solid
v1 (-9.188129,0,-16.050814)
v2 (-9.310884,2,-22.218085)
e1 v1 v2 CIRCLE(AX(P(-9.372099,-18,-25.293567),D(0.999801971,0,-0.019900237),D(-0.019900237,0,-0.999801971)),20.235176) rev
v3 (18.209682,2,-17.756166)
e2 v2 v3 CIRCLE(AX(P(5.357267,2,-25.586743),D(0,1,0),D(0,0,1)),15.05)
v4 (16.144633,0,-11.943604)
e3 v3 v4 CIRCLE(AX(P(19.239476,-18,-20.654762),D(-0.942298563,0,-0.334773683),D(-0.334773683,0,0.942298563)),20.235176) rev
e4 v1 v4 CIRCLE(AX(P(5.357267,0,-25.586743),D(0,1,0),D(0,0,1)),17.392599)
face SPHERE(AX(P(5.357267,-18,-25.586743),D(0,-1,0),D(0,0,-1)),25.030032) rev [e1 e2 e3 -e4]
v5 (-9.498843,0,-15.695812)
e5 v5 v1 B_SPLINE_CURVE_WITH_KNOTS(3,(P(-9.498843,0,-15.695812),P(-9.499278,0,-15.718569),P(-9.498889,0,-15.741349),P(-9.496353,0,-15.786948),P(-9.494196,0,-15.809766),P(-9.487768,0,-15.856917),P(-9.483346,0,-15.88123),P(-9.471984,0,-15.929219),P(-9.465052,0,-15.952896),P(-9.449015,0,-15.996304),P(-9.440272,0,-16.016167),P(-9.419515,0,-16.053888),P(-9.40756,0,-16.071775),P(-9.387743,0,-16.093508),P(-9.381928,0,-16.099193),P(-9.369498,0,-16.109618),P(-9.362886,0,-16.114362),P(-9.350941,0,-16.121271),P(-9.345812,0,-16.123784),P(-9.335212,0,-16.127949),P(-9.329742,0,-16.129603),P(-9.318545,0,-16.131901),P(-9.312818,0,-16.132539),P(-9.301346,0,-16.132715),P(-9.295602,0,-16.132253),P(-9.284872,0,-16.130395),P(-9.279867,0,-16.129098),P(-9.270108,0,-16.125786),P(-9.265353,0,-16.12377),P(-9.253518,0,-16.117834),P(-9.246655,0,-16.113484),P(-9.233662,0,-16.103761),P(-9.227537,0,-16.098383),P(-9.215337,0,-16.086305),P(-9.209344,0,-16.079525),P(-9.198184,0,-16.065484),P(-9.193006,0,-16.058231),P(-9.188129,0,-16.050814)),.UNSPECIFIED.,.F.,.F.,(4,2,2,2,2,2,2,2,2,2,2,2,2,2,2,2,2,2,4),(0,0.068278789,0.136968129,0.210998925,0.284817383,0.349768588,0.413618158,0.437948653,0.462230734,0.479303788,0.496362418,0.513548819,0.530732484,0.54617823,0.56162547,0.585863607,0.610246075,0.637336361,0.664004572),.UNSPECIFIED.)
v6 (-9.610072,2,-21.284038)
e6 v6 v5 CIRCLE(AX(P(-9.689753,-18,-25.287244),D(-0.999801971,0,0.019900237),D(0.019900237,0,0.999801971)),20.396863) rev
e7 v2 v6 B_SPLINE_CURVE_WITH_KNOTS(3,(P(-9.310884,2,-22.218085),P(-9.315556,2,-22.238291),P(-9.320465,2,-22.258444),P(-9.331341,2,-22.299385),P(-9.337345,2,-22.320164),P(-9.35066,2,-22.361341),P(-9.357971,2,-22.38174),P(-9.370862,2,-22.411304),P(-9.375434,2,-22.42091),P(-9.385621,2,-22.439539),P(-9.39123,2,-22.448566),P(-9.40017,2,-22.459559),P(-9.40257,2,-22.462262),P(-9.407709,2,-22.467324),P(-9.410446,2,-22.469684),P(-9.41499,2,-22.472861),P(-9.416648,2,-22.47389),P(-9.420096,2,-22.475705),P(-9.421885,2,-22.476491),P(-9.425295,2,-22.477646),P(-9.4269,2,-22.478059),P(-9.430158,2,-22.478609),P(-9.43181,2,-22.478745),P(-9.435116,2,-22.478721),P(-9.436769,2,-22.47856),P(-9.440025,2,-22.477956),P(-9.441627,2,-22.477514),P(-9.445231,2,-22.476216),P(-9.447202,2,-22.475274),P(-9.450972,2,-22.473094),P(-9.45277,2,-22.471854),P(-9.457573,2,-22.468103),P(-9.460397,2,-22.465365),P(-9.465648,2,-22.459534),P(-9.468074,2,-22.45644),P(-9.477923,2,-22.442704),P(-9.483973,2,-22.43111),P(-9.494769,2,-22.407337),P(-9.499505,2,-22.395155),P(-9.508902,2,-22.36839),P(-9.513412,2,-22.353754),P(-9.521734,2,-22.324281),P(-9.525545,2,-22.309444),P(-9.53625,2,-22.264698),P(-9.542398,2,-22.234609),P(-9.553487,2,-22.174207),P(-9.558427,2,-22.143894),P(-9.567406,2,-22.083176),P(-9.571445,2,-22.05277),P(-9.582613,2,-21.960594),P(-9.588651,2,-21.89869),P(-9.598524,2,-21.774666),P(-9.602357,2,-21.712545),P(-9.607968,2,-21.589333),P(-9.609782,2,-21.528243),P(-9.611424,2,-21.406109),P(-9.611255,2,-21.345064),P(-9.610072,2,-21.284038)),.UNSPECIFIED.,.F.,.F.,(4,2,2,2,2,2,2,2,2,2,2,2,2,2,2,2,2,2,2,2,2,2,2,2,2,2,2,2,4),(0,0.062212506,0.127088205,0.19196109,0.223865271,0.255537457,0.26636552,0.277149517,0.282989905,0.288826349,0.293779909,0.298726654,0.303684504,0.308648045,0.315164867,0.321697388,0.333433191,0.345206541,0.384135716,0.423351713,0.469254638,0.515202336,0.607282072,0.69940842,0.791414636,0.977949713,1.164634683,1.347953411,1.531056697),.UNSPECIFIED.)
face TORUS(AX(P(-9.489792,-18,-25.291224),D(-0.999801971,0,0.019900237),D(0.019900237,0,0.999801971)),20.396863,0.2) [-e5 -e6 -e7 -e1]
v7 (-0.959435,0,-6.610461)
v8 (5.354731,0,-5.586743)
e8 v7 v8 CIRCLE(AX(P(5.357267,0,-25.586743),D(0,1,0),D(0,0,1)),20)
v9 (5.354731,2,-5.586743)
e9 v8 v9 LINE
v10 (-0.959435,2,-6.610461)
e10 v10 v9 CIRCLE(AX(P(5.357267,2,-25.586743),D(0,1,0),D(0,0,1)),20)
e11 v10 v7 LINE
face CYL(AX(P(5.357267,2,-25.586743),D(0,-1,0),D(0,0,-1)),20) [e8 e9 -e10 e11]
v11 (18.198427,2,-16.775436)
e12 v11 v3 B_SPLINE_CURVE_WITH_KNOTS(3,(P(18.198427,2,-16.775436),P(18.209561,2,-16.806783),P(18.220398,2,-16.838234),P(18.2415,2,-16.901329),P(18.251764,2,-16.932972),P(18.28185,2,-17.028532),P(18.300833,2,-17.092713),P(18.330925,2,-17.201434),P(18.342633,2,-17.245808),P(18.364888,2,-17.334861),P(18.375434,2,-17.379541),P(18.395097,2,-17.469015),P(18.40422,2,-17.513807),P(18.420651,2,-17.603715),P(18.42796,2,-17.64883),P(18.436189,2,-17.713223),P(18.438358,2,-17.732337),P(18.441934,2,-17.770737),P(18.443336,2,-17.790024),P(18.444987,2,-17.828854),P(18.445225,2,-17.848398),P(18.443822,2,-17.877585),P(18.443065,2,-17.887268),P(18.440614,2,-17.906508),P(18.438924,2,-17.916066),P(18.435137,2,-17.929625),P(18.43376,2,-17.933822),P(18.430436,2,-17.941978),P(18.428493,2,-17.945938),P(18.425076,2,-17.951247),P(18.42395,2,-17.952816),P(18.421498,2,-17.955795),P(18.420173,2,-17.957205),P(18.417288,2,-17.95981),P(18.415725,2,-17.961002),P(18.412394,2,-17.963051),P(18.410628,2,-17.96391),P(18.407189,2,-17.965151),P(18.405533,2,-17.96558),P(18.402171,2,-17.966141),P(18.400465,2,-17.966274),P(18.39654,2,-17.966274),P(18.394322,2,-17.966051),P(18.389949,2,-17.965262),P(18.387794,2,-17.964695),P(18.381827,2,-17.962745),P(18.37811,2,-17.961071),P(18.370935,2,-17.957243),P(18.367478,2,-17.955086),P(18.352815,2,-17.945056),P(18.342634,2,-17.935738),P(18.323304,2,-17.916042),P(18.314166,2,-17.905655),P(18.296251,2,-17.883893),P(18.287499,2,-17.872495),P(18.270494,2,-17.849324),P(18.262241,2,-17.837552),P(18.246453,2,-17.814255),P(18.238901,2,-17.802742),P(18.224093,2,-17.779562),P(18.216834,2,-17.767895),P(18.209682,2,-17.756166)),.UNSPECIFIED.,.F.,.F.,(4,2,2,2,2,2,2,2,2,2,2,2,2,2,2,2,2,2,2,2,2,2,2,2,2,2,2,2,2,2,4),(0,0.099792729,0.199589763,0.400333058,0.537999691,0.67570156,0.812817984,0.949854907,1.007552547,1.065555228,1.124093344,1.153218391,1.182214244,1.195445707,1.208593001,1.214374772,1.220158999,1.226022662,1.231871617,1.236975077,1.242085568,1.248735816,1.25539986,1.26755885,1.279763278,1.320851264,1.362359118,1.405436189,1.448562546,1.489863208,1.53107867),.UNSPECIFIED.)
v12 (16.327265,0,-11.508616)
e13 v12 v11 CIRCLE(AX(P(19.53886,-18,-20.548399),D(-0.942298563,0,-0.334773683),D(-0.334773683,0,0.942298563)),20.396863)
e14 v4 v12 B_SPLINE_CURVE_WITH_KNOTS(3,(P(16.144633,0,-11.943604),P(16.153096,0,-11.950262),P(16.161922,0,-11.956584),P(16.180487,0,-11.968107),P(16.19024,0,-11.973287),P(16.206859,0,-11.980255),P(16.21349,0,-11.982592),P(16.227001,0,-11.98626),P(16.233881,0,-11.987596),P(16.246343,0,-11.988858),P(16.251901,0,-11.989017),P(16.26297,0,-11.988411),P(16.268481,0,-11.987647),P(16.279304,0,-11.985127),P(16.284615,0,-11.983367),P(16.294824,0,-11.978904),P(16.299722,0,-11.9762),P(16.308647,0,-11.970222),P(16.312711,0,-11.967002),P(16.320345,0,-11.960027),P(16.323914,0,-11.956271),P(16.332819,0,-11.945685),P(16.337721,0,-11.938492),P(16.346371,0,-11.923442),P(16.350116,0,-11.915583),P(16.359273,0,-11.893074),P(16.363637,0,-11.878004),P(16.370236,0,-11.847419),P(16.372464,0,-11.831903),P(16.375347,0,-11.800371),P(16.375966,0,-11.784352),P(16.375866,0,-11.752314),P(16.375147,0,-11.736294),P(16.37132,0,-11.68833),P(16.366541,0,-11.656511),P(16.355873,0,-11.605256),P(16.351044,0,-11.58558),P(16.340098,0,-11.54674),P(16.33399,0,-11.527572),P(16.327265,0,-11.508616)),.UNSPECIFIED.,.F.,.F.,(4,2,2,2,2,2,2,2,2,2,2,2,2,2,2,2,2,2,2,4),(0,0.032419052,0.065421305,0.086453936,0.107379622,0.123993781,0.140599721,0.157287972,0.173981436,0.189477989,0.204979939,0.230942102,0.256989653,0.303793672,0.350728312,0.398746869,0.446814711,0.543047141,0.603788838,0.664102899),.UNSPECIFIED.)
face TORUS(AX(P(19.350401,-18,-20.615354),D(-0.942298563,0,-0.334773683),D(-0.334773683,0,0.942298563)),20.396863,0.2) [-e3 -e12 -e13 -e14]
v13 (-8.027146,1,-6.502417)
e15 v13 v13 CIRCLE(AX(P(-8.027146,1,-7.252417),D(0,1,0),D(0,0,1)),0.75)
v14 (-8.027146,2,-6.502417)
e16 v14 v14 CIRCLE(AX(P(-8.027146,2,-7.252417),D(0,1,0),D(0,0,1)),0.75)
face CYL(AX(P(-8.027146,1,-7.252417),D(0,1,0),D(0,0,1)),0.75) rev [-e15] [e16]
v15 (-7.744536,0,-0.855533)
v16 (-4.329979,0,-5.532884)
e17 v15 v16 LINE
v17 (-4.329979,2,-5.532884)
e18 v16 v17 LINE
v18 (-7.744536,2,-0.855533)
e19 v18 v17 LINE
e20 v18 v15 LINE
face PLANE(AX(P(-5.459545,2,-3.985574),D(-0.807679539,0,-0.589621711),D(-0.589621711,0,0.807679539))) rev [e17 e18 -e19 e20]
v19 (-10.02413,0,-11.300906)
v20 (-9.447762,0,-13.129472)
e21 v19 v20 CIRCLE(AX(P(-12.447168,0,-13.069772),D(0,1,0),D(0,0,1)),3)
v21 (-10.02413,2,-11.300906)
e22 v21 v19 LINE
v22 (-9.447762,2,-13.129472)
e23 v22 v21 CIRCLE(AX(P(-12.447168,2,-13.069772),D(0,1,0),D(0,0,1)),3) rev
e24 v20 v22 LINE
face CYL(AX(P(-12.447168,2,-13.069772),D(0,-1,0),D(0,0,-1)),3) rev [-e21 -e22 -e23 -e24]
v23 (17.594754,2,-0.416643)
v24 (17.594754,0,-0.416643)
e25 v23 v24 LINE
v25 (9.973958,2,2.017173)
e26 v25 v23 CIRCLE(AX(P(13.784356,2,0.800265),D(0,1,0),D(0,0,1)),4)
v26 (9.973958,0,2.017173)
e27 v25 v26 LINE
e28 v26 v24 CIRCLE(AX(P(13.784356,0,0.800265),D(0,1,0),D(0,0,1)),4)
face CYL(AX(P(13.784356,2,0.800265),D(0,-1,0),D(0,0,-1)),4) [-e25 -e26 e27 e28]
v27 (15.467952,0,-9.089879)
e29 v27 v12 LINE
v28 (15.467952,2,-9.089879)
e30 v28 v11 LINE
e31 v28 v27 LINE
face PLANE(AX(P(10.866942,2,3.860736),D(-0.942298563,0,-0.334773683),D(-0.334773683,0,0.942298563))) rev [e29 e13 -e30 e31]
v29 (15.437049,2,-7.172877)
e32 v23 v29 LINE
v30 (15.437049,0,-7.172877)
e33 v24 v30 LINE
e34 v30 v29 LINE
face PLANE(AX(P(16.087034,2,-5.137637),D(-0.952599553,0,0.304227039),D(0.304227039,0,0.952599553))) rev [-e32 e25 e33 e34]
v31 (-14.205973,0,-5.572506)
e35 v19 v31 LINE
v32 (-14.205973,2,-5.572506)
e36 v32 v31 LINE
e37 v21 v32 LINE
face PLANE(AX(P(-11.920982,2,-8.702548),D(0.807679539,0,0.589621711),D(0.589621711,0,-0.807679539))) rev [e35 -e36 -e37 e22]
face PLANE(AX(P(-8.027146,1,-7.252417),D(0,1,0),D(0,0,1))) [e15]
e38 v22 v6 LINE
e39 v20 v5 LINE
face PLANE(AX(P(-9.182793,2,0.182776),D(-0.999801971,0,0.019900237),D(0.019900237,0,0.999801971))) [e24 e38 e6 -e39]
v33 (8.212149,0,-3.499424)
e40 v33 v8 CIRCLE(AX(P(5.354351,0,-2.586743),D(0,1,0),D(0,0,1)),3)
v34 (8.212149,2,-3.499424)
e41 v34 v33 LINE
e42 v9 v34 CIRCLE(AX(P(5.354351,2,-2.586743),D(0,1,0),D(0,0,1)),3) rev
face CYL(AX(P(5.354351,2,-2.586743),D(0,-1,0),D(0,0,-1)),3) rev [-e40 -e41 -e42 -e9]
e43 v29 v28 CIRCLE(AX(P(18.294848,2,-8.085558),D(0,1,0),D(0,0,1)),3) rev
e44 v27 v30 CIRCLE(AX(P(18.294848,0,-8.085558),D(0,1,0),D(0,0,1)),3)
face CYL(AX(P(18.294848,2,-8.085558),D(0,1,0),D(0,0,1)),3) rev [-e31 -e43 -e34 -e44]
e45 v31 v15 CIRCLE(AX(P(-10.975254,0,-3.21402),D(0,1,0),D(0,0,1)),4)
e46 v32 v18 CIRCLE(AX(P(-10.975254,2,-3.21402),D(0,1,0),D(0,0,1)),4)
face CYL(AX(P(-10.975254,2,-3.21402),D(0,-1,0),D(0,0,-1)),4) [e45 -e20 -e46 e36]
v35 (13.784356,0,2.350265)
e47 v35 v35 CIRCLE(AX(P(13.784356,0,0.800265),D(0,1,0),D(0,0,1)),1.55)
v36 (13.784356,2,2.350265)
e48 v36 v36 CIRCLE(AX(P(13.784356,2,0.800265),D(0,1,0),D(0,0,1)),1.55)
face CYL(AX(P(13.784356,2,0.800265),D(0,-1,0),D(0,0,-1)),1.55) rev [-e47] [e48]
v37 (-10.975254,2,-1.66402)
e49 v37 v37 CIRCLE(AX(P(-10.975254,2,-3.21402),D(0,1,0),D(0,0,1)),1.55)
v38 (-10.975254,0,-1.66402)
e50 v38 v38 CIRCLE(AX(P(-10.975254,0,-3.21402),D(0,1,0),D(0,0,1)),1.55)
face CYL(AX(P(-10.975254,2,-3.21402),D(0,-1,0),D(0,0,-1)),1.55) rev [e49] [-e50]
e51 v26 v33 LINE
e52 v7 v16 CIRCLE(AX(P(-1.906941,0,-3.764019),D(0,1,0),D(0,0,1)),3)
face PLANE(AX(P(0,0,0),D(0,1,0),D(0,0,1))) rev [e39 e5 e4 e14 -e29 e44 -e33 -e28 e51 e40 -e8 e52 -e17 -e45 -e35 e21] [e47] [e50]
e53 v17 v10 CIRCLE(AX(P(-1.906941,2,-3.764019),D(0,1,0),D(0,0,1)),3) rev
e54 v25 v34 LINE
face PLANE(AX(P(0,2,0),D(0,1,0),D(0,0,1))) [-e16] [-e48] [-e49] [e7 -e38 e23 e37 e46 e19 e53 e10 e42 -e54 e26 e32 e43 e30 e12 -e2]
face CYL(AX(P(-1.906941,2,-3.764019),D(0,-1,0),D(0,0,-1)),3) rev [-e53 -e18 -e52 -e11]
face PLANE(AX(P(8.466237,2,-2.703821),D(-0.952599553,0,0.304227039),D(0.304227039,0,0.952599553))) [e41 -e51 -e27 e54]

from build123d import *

# Parameters (mm, degrees)
SKETCH_1_R          = 1.55
EXTRUDE_1_DEPTH     = 2
FILLET_1_R          = 3
FILLET_2_R          = 0.2
SKETCH_3_R          = 0.75
CUT_EXTRUDE_1_DEPTH = 1


with BuildPart() as part:
    # 草图1 → 凸台-拉伸1 (new body)
    with BuildSketch(Plane(origin=(0, 0, 0), x_dir=(1, 0, 0), z_dir=(0, 1, 0))):
        with BuildLine():
            Line((-9.427629845, 12.118007633), (-14.205972572, 5.57250637))
            ThreePointArc((-14.205972572, 5.57250637), (-13.333741258, -0.01669863), (-7.744536258, 0.855532684))
            Line((-7.744536258, 0.855532684), (-2.966193531, 7.401033946))
            ThreePointArc((-2.966193531, 7.401033946), (2.156455687, 5.844533995), (7.508476858, 5.702771934))
            Line((7.508476858, 5.702771934), (9.973957748, -2.017173013))
            ThreePointArc((9.973957748, -2.017173013), (15.001264118, -4.610663069), (17.594754173, 0.416643301))
            Line((17.594754173, 0.416643301), (15.129273283, 8.136588247))
            Line((15.129273283, 8.136588247), (19.53886034, 20.548398832))
            ThreePointArc((19.53886034, 20.548398832), (2.94865648, 10.730730666), (-9.689752685, 25.287244194))
            Line((-9.689752685, 25.287244194), (-9.427629845, 12.118007633))
        make_face()
        with Locations(Location((13.784355961, -0.800264856, 0), (0, 0, 270))):
            Circle(SKETCH_1_R, mode=Mode.SUBTRACT)
        with Locations(Location((-10.975254415, 3.214019527, 0), (0, 0, 270))):
            Circle(SKETCH_1_R, mode=Mode.SUBTRACT)
    extrude(amount=EXTRUDE_1_DEPTH)

    # 圆角1
    fillet_1_edges = [part.edges().sort_by_distance(p)[0] for p in [
        (-9.427629845, 1, -12.118007633),
        (15.129273283, 1, -8.136588247),
        (7.508476858, 1, -5.702771934),
        (-2.966193531, 1, -7.401033946),
    ]]
    fillet(fillet_1_edges, radius=FILLET_1_R)

    # 草图2 → 切除-旋转1 (revolve, cut)
    with BuildSketch(Plane(origin=(5.357266973, 0, 0), x_dir=(0, -1, 0), z_dir=(-1, 0, 0))):
        with BuildLine():
            Line((43.030031962, -25.586742765), (-7.030031962, -25.586742765))
            ThreePointArc((-7.030031962, -25.586742765), (18, -0.556710804), (43.030031962, -25.586742765))
        make_face()
    revolve(axis=Axis((5.357266973, -43.030031962, -25.586742765), (0, 1, 0)), mode=Mode.SUBTRACT)

    # 圆角2
    # the kernel refuses this fillet: 0.2 mm, written as the material it takes off along each edge
    with BuildSketch(Plane(origin=(19.53886034, -18, -20.548398832), x_dir=(-0.1606859623720409, 0.8772773226728997, 0.4522880947144644), z_dir=(-0.29368936055859224, -0.47998385298244073, 0.8266571601158587))) as fillet_2_piece_1:
        with BuildLine():
            CenterArc((20.396862817, 0.2), FILLET_2_R, 143.943391902, 126.056608098)
            Line((20.396862817, 0), (20, 0))
            ThreePointArc((20, 0), (20.118215024, 0.158394169), (20.235175643, 0.317716854))
        make_face()
    revolve(axis=Axis((19.53886034, -18, -20.548398832), (-0.9422985625539585, 0, -0.3347736832678813)), revolution_arc=31.526759785, mode=Mode.SUBTRACT)
    with BuildSketch(Plane(origin=(-9.689752685, -18, -25.287244194), x_dir=(-0.0009868358148414909, 0.9987697013737694, -0.049579328079614966), z_dir=(-0.01987575403412073, -0.049589148185379746, -0.9985719156794987))) as fillet_2_piece_2:
        with BuildLine():
            CenterArc((20.396862817, 0.2), FILLET_2_R, 143.943391902, 126.056608098)
            ThreePointArc((20.235175643, 0.317716854), (20.118215024, 0.158394169), (20, 0))
            Line((20, 0), (20.396862817, 0))
        make_face()
    revolve(axis=Axis((-9.689752685, -18, -25.287244194), (0.9998019706705172, 0, -0.019900237268694068)), revolution_arc=31.526762102, mode=Mode.SUBTRACT)

    # 草图3 → 切除-拉伸1 (cut)
    with BuildSketch(Plane(origin=(0, 2, 0), x_dir=(1, 0, 0), z_dir=(0, 1, 0))):
        with Locations(Location((-8.027145861, 7.252417223, 0), (0, 0, 270))):
            Circle(SKETCH_3_R)
    extrude(amount=-CUT_EXTRUDE_1_DEPTH, mode=Mode.SUBTRACT)


solid = part.part
